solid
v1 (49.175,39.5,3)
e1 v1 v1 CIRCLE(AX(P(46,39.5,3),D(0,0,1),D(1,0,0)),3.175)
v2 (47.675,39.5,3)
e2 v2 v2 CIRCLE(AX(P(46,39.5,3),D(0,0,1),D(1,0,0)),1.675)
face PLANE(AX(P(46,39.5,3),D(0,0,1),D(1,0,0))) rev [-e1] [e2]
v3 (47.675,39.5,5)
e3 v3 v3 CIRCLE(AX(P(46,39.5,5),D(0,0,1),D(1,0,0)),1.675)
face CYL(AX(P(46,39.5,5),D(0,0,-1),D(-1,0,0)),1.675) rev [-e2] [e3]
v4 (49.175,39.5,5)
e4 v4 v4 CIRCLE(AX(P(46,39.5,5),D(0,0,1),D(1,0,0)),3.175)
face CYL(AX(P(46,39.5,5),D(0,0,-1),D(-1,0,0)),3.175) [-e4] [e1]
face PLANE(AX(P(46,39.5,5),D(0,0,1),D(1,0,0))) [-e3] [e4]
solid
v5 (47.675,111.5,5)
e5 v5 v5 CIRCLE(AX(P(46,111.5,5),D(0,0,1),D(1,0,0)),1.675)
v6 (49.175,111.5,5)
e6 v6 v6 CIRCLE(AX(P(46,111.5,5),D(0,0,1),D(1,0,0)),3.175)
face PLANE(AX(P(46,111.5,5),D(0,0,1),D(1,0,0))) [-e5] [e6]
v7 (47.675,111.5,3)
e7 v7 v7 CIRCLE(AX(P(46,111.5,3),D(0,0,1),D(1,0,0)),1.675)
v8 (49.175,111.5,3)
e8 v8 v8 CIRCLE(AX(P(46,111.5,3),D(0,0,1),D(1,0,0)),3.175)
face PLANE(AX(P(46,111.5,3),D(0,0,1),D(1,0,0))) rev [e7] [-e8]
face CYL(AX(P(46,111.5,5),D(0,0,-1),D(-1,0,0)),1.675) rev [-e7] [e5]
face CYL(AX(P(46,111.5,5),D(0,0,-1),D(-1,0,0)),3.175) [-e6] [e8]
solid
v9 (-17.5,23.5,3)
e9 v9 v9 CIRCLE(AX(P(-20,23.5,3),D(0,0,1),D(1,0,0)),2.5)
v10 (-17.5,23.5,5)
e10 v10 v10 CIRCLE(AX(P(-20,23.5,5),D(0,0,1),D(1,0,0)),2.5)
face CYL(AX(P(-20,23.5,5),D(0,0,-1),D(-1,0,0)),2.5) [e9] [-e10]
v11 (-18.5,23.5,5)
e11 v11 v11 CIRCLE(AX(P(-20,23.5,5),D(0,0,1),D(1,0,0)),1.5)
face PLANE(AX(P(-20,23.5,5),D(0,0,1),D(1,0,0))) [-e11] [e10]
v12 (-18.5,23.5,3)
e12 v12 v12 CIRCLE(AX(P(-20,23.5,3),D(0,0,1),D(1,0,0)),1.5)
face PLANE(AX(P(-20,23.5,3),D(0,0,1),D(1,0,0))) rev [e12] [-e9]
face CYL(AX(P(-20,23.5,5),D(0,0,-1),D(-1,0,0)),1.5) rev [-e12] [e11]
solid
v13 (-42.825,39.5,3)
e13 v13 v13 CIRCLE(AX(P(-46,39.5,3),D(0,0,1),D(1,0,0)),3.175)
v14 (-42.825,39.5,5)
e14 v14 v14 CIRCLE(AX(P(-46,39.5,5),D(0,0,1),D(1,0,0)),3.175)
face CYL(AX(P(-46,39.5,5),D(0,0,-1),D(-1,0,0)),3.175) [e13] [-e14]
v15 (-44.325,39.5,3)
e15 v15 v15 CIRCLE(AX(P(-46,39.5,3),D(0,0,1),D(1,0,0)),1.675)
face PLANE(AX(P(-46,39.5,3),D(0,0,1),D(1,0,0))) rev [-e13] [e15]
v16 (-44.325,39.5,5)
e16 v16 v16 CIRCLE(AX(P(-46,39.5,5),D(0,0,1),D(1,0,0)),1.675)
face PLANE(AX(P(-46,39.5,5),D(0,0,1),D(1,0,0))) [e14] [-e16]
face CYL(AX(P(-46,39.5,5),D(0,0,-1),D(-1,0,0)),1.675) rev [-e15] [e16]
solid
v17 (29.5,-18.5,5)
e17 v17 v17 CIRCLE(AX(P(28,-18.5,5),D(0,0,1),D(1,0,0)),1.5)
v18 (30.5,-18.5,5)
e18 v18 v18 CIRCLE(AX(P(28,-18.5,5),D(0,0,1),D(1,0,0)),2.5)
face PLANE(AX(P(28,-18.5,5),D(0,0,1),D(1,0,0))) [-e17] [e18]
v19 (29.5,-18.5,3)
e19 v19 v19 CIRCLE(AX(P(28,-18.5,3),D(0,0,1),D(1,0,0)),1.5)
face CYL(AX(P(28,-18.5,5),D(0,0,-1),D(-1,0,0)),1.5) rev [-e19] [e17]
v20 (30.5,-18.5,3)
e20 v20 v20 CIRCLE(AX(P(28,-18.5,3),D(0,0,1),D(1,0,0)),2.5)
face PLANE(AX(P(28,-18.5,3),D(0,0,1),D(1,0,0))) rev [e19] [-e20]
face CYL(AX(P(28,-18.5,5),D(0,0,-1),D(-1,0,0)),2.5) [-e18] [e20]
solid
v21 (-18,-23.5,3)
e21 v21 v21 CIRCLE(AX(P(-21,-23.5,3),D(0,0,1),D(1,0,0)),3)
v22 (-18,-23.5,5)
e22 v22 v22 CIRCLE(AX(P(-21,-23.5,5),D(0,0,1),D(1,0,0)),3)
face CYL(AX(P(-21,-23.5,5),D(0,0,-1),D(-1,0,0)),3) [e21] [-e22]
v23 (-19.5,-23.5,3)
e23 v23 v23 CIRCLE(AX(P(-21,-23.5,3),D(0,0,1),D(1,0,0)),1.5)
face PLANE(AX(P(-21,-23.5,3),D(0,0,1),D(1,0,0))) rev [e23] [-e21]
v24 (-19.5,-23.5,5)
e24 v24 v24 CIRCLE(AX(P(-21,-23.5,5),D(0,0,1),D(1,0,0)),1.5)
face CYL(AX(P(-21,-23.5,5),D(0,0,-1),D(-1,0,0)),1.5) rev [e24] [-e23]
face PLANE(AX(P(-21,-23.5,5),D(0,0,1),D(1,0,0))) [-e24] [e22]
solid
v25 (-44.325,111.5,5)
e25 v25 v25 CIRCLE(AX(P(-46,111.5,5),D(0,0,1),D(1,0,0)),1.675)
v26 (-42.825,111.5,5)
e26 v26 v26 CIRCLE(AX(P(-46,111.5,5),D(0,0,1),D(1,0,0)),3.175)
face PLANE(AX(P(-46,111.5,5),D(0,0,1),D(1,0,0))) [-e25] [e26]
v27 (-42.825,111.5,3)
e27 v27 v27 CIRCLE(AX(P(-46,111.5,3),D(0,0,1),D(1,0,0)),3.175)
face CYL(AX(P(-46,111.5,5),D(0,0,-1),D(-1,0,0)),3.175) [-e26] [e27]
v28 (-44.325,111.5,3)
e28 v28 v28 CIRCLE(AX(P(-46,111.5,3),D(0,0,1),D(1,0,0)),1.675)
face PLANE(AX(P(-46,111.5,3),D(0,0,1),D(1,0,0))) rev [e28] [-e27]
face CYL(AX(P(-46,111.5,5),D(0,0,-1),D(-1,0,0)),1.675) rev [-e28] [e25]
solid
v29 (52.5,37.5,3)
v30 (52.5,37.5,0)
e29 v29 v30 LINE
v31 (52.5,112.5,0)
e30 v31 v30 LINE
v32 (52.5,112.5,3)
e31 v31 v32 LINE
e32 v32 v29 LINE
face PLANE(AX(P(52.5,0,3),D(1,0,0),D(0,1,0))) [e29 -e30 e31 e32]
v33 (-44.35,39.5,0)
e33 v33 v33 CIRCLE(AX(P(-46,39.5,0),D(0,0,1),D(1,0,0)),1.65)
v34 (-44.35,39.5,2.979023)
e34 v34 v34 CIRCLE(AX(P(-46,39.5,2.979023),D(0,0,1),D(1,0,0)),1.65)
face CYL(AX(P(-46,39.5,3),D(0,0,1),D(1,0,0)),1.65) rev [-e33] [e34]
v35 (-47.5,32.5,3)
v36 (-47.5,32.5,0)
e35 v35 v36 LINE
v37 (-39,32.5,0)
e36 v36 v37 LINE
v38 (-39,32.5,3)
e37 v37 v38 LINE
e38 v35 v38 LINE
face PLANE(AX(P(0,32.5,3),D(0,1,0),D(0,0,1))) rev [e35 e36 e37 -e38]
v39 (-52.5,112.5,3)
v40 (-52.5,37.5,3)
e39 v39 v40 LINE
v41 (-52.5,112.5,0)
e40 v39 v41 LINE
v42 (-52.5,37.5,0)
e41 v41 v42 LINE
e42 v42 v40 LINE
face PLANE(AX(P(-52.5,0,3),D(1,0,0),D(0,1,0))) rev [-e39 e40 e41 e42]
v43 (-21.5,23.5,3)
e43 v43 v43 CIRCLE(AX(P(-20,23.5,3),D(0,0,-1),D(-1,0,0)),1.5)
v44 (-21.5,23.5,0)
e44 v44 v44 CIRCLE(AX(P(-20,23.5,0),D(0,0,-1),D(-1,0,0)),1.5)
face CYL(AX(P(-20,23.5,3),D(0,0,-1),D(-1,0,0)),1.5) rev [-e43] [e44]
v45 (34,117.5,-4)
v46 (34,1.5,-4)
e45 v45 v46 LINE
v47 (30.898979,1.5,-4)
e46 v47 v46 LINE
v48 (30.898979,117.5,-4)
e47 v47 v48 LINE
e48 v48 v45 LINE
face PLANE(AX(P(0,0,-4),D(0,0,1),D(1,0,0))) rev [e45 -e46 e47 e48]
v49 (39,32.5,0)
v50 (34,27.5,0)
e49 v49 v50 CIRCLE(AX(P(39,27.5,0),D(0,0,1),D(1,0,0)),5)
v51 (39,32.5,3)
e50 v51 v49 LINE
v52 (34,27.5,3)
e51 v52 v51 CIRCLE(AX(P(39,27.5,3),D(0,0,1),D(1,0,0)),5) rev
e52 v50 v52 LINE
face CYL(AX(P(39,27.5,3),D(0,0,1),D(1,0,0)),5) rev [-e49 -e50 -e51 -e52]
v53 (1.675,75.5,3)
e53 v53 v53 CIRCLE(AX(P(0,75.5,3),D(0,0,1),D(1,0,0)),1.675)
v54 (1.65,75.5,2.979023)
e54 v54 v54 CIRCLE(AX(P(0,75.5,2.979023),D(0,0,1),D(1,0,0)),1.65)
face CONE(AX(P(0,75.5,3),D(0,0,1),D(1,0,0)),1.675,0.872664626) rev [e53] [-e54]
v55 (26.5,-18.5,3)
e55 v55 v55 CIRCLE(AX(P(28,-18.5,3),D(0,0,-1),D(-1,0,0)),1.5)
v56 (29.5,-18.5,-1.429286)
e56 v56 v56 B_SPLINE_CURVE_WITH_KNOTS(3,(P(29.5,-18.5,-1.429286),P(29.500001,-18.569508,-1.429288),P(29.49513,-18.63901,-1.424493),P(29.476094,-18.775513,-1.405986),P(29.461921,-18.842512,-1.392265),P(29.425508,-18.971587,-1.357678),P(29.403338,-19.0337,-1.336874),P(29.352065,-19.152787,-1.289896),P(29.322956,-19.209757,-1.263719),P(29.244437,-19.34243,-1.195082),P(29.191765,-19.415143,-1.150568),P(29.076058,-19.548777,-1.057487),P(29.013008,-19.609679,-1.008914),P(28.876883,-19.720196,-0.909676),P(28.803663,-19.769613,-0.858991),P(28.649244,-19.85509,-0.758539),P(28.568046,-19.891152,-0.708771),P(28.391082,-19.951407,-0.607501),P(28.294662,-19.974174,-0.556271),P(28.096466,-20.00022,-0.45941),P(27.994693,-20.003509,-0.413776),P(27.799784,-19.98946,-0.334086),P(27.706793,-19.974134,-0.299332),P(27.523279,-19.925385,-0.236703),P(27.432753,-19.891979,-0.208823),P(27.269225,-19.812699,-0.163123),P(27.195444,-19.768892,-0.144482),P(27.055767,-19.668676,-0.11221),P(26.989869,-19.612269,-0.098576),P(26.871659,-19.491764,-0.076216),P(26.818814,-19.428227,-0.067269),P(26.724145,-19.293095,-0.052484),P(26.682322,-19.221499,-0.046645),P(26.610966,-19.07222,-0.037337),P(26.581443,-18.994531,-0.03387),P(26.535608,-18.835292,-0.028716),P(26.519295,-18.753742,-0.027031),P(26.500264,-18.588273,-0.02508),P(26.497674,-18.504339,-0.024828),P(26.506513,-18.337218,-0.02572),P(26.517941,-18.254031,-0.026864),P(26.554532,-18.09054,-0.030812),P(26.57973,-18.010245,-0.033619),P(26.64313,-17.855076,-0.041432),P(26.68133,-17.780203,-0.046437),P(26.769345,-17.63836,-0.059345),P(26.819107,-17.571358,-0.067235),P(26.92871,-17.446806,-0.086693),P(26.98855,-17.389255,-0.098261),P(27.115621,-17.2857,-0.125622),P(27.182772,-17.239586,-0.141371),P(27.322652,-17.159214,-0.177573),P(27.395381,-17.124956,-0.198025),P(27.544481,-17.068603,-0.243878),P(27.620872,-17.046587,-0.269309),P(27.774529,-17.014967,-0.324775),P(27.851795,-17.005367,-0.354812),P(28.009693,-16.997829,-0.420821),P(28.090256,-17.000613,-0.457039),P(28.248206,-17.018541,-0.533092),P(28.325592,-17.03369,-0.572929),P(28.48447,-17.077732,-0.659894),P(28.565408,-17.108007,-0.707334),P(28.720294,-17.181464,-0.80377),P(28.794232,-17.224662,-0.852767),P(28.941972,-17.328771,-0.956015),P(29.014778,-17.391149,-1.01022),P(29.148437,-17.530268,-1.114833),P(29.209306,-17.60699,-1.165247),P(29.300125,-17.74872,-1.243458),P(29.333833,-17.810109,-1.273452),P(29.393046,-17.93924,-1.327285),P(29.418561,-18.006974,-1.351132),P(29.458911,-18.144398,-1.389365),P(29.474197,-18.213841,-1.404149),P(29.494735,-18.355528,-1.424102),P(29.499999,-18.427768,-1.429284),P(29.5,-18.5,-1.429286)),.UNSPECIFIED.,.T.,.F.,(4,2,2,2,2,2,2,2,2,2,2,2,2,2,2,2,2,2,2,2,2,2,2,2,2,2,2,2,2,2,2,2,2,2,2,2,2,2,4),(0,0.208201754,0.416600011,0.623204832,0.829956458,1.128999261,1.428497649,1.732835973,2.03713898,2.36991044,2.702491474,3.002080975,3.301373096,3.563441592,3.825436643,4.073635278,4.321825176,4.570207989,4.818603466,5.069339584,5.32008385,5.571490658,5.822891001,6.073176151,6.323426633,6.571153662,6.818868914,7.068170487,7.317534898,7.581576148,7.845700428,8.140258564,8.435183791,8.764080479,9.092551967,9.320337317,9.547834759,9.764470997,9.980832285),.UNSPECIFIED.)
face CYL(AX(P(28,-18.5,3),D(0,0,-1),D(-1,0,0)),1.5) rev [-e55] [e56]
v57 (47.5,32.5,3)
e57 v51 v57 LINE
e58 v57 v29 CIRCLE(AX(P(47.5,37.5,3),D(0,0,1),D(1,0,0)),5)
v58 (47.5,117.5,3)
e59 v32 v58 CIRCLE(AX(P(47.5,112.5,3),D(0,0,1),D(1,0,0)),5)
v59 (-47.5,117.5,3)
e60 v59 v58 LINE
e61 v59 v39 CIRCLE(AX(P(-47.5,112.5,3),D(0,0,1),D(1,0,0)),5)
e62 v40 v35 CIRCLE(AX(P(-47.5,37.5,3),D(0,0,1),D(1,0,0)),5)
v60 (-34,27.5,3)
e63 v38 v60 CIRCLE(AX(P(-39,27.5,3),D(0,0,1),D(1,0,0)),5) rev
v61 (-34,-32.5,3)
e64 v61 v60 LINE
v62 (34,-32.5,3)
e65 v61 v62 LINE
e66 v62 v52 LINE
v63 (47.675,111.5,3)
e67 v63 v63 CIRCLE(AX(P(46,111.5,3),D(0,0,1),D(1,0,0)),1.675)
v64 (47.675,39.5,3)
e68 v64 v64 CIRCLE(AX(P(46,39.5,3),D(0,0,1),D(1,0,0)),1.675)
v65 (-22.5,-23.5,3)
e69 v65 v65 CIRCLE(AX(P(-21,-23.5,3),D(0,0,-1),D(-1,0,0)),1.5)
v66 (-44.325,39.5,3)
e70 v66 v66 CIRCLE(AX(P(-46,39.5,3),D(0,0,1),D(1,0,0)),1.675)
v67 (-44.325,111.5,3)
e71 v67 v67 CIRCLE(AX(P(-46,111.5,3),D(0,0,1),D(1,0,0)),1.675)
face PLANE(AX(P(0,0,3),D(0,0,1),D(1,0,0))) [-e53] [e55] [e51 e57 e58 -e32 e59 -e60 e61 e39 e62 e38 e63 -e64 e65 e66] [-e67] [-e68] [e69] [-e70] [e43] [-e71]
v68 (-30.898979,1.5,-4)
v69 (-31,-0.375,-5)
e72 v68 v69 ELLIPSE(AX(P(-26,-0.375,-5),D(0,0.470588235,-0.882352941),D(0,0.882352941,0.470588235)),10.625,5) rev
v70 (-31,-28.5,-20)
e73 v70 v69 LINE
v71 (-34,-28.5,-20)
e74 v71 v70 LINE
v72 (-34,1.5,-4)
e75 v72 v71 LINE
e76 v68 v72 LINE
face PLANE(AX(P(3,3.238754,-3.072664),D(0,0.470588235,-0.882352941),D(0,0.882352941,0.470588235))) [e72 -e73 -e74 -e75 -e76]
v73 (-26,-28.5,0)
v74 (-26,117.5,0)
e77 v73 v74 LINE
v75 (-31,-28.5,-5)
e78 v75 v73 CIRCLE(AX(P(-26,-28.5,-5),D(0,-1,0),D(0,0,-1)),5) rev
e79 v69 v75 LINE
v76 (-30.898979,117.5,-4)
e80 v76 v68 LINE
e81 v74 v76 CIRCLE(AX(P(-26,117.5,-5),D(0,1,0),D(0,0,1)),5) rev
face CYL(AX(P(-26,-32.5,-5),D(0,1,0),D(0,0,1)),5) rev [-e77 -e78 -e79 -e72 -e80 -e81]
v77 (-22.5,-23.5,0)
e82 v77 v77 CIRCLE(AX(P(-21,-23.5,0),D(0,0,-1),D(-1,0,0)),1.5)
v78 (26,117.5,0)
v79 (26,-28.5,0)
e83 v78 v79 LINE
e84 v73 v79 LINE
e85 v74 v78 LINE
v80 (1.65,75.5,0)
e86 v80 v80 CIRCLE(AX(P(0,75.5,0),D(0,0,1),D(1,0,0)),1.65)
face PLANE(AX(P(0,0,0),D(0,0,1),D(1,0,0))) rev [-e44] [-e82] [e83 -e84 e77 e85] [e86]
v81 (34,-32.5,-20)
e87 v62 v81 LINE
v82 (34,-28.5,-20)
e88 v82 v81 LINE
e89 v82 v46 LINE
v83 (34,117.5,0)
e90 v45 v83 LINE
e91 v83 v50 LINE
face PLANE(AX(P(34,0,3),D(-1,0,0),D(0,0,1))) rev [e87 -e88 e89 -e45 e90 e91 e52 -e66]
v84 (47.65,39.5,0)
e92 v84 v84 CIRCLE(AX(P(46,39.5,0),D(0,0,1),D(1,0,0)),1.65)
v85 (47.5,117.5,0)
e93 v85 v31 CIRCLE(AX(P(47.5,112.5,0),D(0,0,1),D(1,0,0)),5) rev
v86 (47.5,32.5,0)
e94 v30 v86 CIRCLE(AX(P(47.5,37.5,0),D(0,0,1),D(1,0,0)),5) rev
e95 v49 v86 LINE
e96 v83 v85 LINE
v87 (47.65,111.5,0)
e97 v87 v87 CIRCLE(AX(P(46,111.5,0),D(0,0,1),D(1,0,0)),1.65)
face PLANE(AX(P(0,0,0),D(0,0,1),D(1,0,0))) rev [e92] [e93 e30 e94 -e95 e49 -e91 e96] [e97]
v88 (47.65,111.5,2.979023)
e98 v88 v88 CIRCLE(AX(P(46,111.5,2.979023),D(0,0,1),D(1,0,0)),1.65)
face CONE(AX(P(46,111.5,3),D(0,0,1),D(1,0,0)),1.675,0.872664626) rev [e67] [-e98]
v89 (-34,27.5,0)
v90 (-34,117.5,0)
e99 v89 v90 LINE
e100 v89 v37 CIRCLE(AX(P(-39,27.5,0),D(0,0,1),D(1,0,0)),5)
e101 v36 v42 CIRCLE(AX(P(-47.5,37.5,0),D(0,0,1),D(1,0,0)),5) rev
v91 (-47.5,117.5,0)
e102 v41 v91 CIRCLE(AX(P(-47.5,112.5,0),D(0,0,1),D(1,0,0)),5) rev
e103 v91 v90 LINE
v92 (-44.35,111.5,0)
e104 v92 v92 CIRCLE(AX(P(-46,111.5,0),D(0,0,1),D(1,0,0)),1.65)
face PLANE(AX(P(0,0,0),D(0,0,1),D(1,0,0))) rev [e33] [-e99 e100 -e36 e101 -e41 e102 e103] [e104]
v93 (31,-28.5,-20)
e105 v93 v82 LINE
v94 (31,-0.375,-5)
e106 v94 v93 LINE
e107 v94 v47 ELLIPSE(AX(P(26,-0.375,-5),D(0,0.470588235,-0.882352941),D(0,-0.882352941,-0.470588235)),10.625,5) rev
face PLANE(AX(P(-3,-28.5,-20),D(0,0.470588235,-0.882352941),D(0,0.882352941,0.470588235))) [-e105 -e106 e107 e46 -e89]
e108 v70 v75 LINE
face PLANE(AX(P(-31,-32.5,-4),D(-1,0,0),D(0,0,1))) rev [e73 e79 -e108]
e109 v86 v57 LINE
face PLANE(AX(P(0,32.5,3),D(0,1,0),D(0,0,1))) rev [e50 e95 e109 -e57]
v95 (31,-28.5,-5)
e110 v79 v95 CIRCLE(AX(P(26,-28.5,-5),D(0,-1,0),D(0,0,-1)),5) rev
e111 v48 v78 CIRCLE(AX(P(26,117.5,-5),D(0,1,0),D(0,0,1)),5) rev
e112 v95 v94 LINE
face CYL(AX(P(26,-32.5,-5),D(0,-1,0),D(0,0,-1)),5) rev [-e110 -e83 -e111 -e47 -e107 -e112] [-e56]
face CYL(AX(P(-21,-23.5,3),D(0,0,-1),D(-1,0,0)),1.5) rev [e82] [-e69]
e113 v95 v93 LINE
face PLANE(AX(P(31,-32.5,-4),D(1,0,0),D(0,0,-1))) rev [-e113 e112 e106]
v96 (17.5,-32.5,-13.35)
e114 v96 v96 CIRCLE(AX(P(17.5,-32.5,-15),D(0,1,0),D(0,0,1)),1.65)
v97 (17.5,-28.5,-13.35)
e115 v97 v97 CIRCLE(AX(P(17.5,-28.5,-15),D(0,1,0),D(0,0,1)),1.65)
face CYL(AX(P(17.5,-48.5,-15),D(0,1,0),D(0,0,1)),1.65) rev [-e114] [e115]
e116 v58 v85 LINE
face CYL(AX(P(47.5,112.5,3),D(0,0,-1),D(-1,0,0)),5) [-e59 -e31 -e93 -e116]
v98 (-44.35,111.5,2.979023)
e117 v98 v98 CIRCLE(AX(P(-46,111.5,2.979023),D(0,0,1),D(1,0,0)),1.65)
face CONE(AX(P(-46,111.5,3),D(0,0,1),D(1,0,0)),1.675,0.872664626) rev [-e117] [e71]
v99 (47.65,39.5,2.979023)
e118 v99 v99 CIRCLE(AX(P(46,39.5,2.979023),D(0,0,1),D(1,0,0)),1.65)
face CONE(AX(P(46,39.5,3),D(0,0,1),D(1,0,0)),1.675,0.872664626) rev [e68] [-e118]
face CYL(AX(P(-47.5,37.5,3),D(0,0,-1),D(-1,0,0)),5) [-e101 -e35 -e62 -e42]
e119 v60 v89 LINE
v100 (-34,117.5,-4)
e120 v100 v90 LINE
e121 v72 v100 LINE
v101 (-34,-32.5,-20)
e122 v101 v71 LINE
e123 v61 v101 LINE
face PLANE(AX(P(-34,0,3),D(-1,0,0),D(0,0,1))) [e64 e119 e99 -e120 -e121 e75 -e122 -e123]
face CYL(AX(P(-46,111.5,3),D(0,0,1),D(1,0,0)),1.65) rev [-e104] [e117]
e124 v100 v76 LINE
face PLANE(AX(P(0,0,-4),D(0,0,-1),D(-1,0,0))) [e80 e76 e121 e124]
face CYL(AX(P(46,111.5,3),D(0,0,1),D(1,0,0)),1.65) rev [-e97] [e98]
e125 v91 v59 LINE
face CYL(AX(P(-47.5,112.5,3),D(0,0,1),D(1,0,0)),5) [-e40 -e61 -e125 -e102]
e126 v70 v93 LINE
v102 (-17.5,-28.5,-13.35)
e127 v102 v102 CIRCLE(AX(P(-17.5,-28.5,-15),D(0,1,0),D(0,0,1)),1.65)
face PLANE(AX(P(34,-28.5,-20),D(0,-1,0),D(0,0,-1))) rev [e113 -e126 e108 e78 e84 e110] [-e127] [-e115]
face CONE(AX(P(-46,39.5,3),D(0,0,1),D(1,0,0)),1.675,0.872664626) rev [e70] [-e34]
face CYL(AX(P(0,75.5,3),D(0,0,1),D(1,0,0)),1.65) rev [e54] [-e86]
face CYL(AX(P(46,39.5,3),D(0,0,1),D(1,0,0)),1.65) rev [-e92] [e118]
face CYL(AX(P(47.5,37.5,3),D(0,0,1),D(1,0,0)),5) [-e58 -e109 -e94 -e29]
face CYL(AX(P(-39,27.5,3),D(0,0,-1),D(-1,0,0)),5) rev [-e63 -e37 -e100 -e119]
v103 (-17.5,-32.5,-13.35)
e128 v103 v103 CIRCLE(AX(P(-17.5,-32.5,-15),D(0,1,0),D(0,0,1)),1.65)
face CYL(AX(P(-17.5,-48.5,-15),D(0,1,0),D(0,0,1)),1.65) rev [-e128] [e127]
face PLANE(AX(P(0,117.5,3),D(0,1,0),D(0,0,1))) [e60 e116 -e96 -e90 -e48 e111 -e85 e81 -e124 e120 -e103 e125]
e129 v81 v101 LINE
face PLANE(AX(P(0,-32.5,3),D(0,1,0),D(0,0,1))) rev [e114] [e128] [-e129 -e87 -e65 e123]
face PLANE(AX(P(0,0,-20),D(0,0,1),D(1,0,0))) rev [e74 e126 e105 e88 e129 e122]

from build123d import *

# Parameters (mm, degrees)
SKETCH_1_W                        = 68
SKETCH_1_H                        = 65
EXTRUDE_1_DEPTH                   = 3
SKETCH_2_W                        = 3
SKETCH_2_H                        = 150
EXTRUDE_2_DEPTH                   = 4
SKETCH_3_W                        = 68
SKETCH_3_H                        = 4
EXTRUDE_3_DEPTH                   = 20
EXTRUDE_4_DEPTH                   = 3
EXTRUDE_START                     = -68
EXTRUDE_5_DEPTH                   = 3
SKETCH_5_R                        = 1.65
CUT_EXTRUDE_1_DEPTH               = 20
HOLE_WIZARD_3_3_3_3_1_D           = 3.3
HOLE_WIZARD_3_3_3_3_1_CSINK_D     = 3.35
HOLE_WIZARD_3_3_3_3_1_CSINK_ANGLE = 100
SKETCH_8_R                        = 1.5
CUT_EXTRUDE_2_DEPTH               = 131.240162776
SKETCH_9_R                        = 3.175
SKETCH_9_R_2                      = 1.675
EXTRUDE_6_DEPTH                   = 2
EXTRUDE_6_2_DEPTH                 = 2
EXTRUDE_6_3_DEPTH                 = 2
EXTRUDE_6_4_DEPTH                 = 2
SKETCH_9_R_3                      = 3
SKETCH_9_R_4                      = 1.5
EXTRUDE_6_5_DEPTH                 = 2
SKETCH_9_R_5                      = 2.5
EXTRUDE_6_6_DEPTH                 = 2
EXTRUDE_6_7_DEPTH                 = 2
FILLET_1_R                        = 5


with BuildPart() as part:
    # 草图1 → 凸台-拉伸1 (new body)
    with BuildSketch(Plane.XY):
        Polygon((-52.5, 32.5), (-34, 32.5), (34, 32.5), (52.5, 32.5), (52.5, 117.5), (-52.5, 117.5), align=None)
        Rectangle(SKETCH_1_W, SKETCH_1_H)
    extrude(amount=EXTRUDE_1_DEPTH)

    # 草图2 → 凸台-拉伸2 (add)
    with BuildSketch(Plane(origin=(0, 0, 0), x_dir=(-1, 0, 0), z_dir=(0, 0, -1))):
        with Locations((-32.5, 42.5)):
            Rectangle(SKETCH_2_W, SKETCH_2_H)
        with Locations((32.5, 42.5)):
            Rectangle(SKETCH_2_W, SKETCH_2_H)
    extrude(amount=EXTRUDE_2_DEPTH)

    # 草图3 → 凸台-拉伸3 (add)
    with BuildSketch(Plane(origin=(0, 0, 0), x_dir=(-1, 0, 0), z_dir=(0, 0, -1))):
        with Locations((0, -30.5)):
            Rectangle(SKETCH_3_W, SKETCH_3_H)
    extrude(amount=EXTRUDE_3_DEPTH)

    # 草图4 → 凸台-拉伸4 (add)
    with BuildSketch(Plane(origin=(34, 0, 0), x_dir=(0, 0, -1), z_dir=(1, 0, 0))):
        Polygon((4, -28.5), (20, -28.5), (4, 1.5), align=None)
    extrude(amount=-EXTRUDE_4_DEPTH)

    # 草图4<2> → 凸台-拉伸5 (add)
    with BuildSketch(Plane(origin=(34, 0, 0), x_dir=(0, 0, -1), z_dir=(1, 0, 0)).offset(EXTRUDE_START)):
        Polygon((4, -28.5), (20, -28.5), (4, 1.5), align=None)
    extrude(amount=EXTRUDE_5_DEPTH)

    # 草图5 → 切除-拉伸1 (cut)
    with BuildSketch(Plane(origin=(0, -28.5, 0), x_dir=(1, 0, 0), z_dir=(0, 1, 0))):
        with Locations(Location((-17.5, 15, 0), (0, 0, 270))):
            Circle(SKETCH_5_R)
        with Locations(Location((17.5, 15, 0), (0, 0, 270))):
            Circle(SKETCH_5_R)
    extrude(amount=-CUT_EXTRUDE_1_DEPTH, mode=Mode.SUBTRACT)

    # Ø3.3 (3.3) 直径孔1 (through all)
    with Locations(Plane.XY.offset(3)):
        with Locations((-46, 111.5), (0, 75.5), (46, 111.5), (-46, 39.5), (46, 39.5)):
            CounterSinkHole(HOLE_WIZARD_3_3_3_3_1_D / 2, HOLE_WIZARD_3_3_3_3_1_CSINK_D / 2, counter_sink_angle=HOLE_WIZARD_3_3_3_3_1_CSINK_ANGLE)

    # 草图8 → 切除-拉伸2 (cut, through all)
    with BuildSketch(Plane(origin=(0, 0, 0), x_dir=(-1, 0, 0), z_dir=(0, 0, -1))):
        with Locations((21, -23.5)):
            Circle(SKETCH_8_R)
        with Locations((-28, -18.5)):
            Circle(SKETCH_8_R)
        with Locations((20, 23.5)):
            Circle(SKETCH_8_R)
    extrude(amount=-CUT_EXTRUDE_2_DEPTH, mode=Mode.SUBTRACT)

    # 圆角1
    # the kernel refuses this fillet: 5 mm, written as the material it adds along each edge
    with BuildSketch(Plane(origin=(-31, -28.5, 0), x_dir=(0, 0, -1), z_dir=(0, 1, 0))) as fillet_1_piece_1_section:
        with BuildLine():
            CenterArc((FILLET_1_R, -FILLET_1_R), FILLET_1_R, 90, 90)
            Line((0, -FILLET_1_R), (0, 0))
            Line((0, 0), (FILLET_1_R, 0))
        make_face()
    fillet_1_piece_1 = extrude(amount=146, mode=Mode.PRIVATE)
    fillet_1_piece_1 = split(fillet_1_piece_1, bisect_by=Plane(origin=(-31.029561629, -10.672563195, -10.492033704), z_dir=(0, -0.4705882352941177, 0.8823529411764706)), keep=Keep.TOP, mode=Mode.PRIVATE)
    fillet_1_piece_1 = split(fillet_1_piece_1, bisect_by=Plane(origin=(-31.029561629, -13.904733041, -4), z_dir=(0, 0, -1)), keep=Keep.TOP, mode=Mode.PRIVATE)
    add(fillet_1_piece_1)
    with BuildSketch(Plane(origin=(-31, -28.5, 0), x_dir=(0, 0, -1), z_dir=(0, 1, 0))) as fillet_1_piece_2_section:
        with BuildLine():
            CenterArc((FILLET_1_R, -FILLET_1_R), FILLET_1_R, 90, 90)
            Line((0, -FILLET_1_R), (0, 0))
            Line((0, 0), (FILLET_1_R, 0))
        make_face()
    fillet_1_piece_2 = extrude(amount=146, mode=Mode.PRIVATE)
    fillet_1_piece_2 = split(fillet_1_piece_2, bisect_by=Plane(origin=(-29.810583617, -6.75580101, -8.403093872), z_dir=(0, -0.4705882352941177, 0.8823529411764706)), keep=Keep.TOP, mode=Mode.PRIVATE)
    fillet_1_piece_2 = split(fillet_1_piece_2, bisect_by=Plane(origin=(-29.810583617, -10.698092045, -4), z_dir=(0, 0, 1)), keep=Keep.TOP, mode=Mode.PRIVATE)
    add(fillet_1_piece_2)
    with BuildSketch(Plane(origin=(-31, -28.5, 0), x_dir=(0, 0, -1), z_dir=(0, 1, 0))) as fillet_1_piece_3_section:
        with BuildLine():
            CenterArc((FILLET_1_R, -FILLET_1_R), FILLET_1_R, 90, 90)
            Line((0, -FILLET_1_R), (0, 0))
            Line((0, 0), (FILLET_1_R, 0))
        make_face()
    fillet_1_piece_3 = extrude(amount=146, mode=Mode.PRIVATE)
    fillet_1_piece_3 = split(fillet_1_piece_3, bisect_by=Plane(origin=(-29.85363948, 50.002505129, 21.868002735), z_dir=(0, 0.4705882352941177, -0.8823529411764706)), keep=Keep.TOP, mode=Mode.PRIVATE)
    fillet_1_piece_3 = split(fillet_1_piece_3, bisect_by=Plane(origin=(-29.85363948, 62.240011281, -4), z_dir=(0, 0, 1)), keep=Keep.TOP, mode=Mode.PRIVATE)
    add(fillet_1_piece_3)
    with BuildSketch(Plane(origin=(31, -28.5, 0), x_dir=(-1, 0, 0), z_dir=(0, 1, 0))) as fillet_1_piece_4_section:
        with BuildLine():
            CenterArc((FILLET_1_R, -FILLET_1_R), FILLET_1_R, 90, 90)
            Line((0, -FILLET_1_R), (0, 0))
            Line((0, 0), (FILLET_1_R, 0))
        make_face()
    fillet_1_piece_4 = extrude(amount=146, mode=Mode.PRIVATE)
    fillet_1_piece_4 = fillet_1_piece_4 - Plane(origin=(28, -18.5, -1.02503775), x_dir=(-1, 0, 0), z_dir=(0, 0, -1)) * Cylinder(1.5, 312, mode=Mode.PRIVATE)
    fillet_1_piece_4 = split(fillet_1_piece_4, bisect_by=Plane(origin=(29.837200994, -6.644507865, -8.343737528), z_dir=(0, -0.4705882352941177, 0.8823529411764706)), keep=Keep.TOP, mode=Mode.PRIVATE)
    fillet_1_piece_4 = split(fillet_1_piece_4, bisect_by=Plane(origin=(29.837200994, -10.547814413, -4), z_dir=(0, 0, 1)), keep=Keep.TOP, mode=Mode.PRIVATE)
    add(fillet_1_piece_4)
    with BuildSketch(Plane(origin=(31, -28.5, 0), x_dir=(-1, 0, 0), z_dir=(0, 1, 0))) as fillet_1_piece_5_section:
        with BuildLine():
            CenterArc((FILLET_1_R, -FILLET_1_R), FILLET_1_R, 90, 90)
            Line((0, -FILLET_1_R), (0, 0))
            Line((0, 0), (FILLET_1_R, 0))
        make_face()
    fillet_1_piece_5 = extrude(amount=146, mode=Mode.PRIVATE)
    fillet_1_piece_5 = split(fillet_1_piece_5, bisect_by=Plane(origin=(31.029561629, -10.672563195, -10.492033704), z_dir=(0, -0.4705882352941177, 0.8823529411764706)), keep=Keep.TOP, mode=Mode.PRIVATE)
    fillet_1_piece_5 = split(fillet_1_piece_5, bisect_by=Plane(origin=(31.029561629, -13.904733041, -4), z_dir=(0, 0, -1)), keep=Keep.TOP, mode=Mode.PRIVATE)
    add(fillet_1_piece_5)
    with BuildSketch(Plane(origin=(31, -28.5, 0), x_dir=(-1, 0, 0), z_dir=(0, 1, 0))) as fillet_1_piece_6_section:
        with BuildLine():
            CenterArc((FILLET_1_R, -FILLET_1_R), FILLET_1_R, 90, 90)
            Line((0, -FILLET_1_R), (0, 0))
            Line((0, 0), (FILLET_1_R, 0))
        make_face()
    fillet_1_piece_6 = extrude(amount=146, mode=Mode.PRIVATE)
    fillet_1_piece_6 = split(fillet_1_piece_6, bisect_by=Plane(origin=(29.85363948, 50.002505129, 21.868002735), z_dir=(0, 0.4705882352941177, -0.8823529411764706)), keep=Keep.TOP, mode=Mode.PRIVATE)
    fillet_1_piece_6 = split(fillet_1_piece_6, bisect_by=Plane(origin=(29.85363948, 62.240011281, -4), z_dir=(0, 0, 1)), keep=Keep.TOP, mode=Mode.PRIVATE)
    add(fillet_1_piece_6)
    with BuildSketch(Plane(origin=(34, 32.5, 0), x_dir=(1, 0, 0), z_dir=(0, 0, 1))) as fillet_1_piece_7:
        with BuildLine():
            CenterArc((FILLET_1_R, -FILLET_1_R), FILLET_1_R, 90, 90)
            Line((0, -FILLET_1_R), (0, 0))
            Line((0, 0), (FILLET_1_R, 0))
        make_face()
    extrude(amount=3)
    with BuildSketch(Plane(origin=(-34, 32.5, 0), x_dir=(-1, 0, 0), z_dir=(0, 0, 1))) as fillet_1_piece_8:
        with BuildLine():
            CenterArc((FILLET_1_R, FILLET_1_R), FILLET_1_R, 180, 90)
            Line((0, FILLET_1_R), (0, 0))
            Line((0, 0), (FILLET_1_R, 0))
        make_face()
    extrude(amount=3)
    # the kernel refuses this fillet: 5 mm, written as the material it takes off along each edge
    with BuildSketch(Plane(origin=(52.5, 32.5, -12.5), x_dir=(-1, 0, 0), z_dir=(0, 0, 1))) as fillet_1_2_piece_1:
        with BuildLine():
            CenterArc((FILLET_1_R, -FILLET_1_R), FILLET_1_R, 90, 90)
            Line((0, -FILLET_1_R), (0, 0))
            Line((0, 0), (FILLET_1_R, 0))
        make_face()
    extrude(amount=28, mode=Mode.SUBTRACT)
    with BuildSketch(Plane(origin=(-52.5, 32.5, -12.5), x_dir=(1, 0, 0), z_dir=(0, 0, 1)), Plane(origin=(-52.5, 117.5, -12.5), x_dir=(0, -1, 0), z_dir=(0, 0, 1)), Plane(origin=(52.5, 117.5, -12.5), x_dir=(-1, 0, 0), z_dir=(0, 0, 1))) as fillet_1_2_piece_2:
        with BuildLine():
            CenterArc((FILLET_1_R, FILLET_1_R), FILLET_1_R, 180, 90)
            Line((0, FILLET_1_R), (0, 0))
            Line((0, 0), (FILLET_1_R, 0))
        make_face()
    extrude(amount=28, mode=Mode.SUBTRACT)


with BuildPart() as body_2:
    # 草图9 → 凸台-拉伸6 (new body)
    with BuildSketch(Plane.XY.offset(3)):
        with Locations((-46, 111.5)):
            Circle(SKETCH_9_R)
        with Locations((-46, 111.5)):
            Circle(SKETCH_9_R_2, mode=Mode.SUBTRACT)
    extrude(amount=EXTRUDE_6_DEPTH)


with BuildPart() as body_3:
    # 草图9 → Extrude 6 2 (new body)
    with BuildSketch(Plane.XY.offset(3)):
        with Locations((46, 111.5)):
            Circle(SKETCH_9_R)
        with Locations((46, 111.5)):
            Circle(SKETCH_9_R_2, mode=Mode.SUBTRACT)
    extrude(amount=EXTRUDE_6_2_DEPTH)


with BuildPart() as body_4:
    # 草图9 → Extrude 6 3 (new body)
    with BuildSketch(Plane.XY.offset(3)):
        with Locations((46, 39.5)):
            Circle(SKETCH_9_R)
        with Locations((46, 39.5)):
            Circle(SKETCH_9_R_2, mode=Mode.SUBTRACT)
    extrude(amount=EXTRUDE_6_3_DEPTH)


with BuildPart() as body_5:
    # 草图9 → Extrude 6 4 (new body)
    with BuildSketch(Plane.XY.offset(3)):
        with Locations((-46, 39.5)):
            Circle(SKETCH_9_R)
        with Locations((-46, 39.5)):
            Circle(SKETCH_9_R_2, mode=Mode.SUBTRACT)
    extrude(amount=EXTRUDE_6_4_DEPTH)


with BuildPart() as body_6:
    # 草图9 → Extrude 6 5 (new body)
    with BuildSketch(Plane.XY.offset(3)):
        with Locations((-21, -23.5)):
            Circle(SKETCH_9_R_3)
        with Locations((-21, -23.5)):
            Circle(SKETCH_9_R_4, mode=Mode.SUBTRACT)
    extrude(amount=EXTRUDE_6_5_DEPTH)


with BuildPart() as body_7:
    # 草图9 → Extrude 6 6 (new body)
    with BuildSketch(Plane.XY.offset(3)):
        with Locations((-20, 23.5)):
            Circle(SKETCH_9_R_5)
        with Locations((-20, 23.5)):
            Circle(SKETCH_9_R_4, mode=Mode.SUBTRACT)
    extrude(amount=EXTRUDE_6_6_DEPTH)


with BuildPart() as body_8:
    # 草图9 → Extrude 6 7 (new body)
    with BuildSketch(Plane.XY.offset(3)):
        with Locations((28, -18.5)):
            Circle(SKETCH_9_R_5)
        with Locations((28, -18.5)):
            Circle(SKETCH_9_R_4, mode=Mode.SUBTRACT)
    extrude(amount=EXTRUDE_6_7_DEPTH)


solid = Compound([part.part, body_2.part, body_3.part, body_4.part, body_5.part, body_6.part, body_7.part, body_8.part])
